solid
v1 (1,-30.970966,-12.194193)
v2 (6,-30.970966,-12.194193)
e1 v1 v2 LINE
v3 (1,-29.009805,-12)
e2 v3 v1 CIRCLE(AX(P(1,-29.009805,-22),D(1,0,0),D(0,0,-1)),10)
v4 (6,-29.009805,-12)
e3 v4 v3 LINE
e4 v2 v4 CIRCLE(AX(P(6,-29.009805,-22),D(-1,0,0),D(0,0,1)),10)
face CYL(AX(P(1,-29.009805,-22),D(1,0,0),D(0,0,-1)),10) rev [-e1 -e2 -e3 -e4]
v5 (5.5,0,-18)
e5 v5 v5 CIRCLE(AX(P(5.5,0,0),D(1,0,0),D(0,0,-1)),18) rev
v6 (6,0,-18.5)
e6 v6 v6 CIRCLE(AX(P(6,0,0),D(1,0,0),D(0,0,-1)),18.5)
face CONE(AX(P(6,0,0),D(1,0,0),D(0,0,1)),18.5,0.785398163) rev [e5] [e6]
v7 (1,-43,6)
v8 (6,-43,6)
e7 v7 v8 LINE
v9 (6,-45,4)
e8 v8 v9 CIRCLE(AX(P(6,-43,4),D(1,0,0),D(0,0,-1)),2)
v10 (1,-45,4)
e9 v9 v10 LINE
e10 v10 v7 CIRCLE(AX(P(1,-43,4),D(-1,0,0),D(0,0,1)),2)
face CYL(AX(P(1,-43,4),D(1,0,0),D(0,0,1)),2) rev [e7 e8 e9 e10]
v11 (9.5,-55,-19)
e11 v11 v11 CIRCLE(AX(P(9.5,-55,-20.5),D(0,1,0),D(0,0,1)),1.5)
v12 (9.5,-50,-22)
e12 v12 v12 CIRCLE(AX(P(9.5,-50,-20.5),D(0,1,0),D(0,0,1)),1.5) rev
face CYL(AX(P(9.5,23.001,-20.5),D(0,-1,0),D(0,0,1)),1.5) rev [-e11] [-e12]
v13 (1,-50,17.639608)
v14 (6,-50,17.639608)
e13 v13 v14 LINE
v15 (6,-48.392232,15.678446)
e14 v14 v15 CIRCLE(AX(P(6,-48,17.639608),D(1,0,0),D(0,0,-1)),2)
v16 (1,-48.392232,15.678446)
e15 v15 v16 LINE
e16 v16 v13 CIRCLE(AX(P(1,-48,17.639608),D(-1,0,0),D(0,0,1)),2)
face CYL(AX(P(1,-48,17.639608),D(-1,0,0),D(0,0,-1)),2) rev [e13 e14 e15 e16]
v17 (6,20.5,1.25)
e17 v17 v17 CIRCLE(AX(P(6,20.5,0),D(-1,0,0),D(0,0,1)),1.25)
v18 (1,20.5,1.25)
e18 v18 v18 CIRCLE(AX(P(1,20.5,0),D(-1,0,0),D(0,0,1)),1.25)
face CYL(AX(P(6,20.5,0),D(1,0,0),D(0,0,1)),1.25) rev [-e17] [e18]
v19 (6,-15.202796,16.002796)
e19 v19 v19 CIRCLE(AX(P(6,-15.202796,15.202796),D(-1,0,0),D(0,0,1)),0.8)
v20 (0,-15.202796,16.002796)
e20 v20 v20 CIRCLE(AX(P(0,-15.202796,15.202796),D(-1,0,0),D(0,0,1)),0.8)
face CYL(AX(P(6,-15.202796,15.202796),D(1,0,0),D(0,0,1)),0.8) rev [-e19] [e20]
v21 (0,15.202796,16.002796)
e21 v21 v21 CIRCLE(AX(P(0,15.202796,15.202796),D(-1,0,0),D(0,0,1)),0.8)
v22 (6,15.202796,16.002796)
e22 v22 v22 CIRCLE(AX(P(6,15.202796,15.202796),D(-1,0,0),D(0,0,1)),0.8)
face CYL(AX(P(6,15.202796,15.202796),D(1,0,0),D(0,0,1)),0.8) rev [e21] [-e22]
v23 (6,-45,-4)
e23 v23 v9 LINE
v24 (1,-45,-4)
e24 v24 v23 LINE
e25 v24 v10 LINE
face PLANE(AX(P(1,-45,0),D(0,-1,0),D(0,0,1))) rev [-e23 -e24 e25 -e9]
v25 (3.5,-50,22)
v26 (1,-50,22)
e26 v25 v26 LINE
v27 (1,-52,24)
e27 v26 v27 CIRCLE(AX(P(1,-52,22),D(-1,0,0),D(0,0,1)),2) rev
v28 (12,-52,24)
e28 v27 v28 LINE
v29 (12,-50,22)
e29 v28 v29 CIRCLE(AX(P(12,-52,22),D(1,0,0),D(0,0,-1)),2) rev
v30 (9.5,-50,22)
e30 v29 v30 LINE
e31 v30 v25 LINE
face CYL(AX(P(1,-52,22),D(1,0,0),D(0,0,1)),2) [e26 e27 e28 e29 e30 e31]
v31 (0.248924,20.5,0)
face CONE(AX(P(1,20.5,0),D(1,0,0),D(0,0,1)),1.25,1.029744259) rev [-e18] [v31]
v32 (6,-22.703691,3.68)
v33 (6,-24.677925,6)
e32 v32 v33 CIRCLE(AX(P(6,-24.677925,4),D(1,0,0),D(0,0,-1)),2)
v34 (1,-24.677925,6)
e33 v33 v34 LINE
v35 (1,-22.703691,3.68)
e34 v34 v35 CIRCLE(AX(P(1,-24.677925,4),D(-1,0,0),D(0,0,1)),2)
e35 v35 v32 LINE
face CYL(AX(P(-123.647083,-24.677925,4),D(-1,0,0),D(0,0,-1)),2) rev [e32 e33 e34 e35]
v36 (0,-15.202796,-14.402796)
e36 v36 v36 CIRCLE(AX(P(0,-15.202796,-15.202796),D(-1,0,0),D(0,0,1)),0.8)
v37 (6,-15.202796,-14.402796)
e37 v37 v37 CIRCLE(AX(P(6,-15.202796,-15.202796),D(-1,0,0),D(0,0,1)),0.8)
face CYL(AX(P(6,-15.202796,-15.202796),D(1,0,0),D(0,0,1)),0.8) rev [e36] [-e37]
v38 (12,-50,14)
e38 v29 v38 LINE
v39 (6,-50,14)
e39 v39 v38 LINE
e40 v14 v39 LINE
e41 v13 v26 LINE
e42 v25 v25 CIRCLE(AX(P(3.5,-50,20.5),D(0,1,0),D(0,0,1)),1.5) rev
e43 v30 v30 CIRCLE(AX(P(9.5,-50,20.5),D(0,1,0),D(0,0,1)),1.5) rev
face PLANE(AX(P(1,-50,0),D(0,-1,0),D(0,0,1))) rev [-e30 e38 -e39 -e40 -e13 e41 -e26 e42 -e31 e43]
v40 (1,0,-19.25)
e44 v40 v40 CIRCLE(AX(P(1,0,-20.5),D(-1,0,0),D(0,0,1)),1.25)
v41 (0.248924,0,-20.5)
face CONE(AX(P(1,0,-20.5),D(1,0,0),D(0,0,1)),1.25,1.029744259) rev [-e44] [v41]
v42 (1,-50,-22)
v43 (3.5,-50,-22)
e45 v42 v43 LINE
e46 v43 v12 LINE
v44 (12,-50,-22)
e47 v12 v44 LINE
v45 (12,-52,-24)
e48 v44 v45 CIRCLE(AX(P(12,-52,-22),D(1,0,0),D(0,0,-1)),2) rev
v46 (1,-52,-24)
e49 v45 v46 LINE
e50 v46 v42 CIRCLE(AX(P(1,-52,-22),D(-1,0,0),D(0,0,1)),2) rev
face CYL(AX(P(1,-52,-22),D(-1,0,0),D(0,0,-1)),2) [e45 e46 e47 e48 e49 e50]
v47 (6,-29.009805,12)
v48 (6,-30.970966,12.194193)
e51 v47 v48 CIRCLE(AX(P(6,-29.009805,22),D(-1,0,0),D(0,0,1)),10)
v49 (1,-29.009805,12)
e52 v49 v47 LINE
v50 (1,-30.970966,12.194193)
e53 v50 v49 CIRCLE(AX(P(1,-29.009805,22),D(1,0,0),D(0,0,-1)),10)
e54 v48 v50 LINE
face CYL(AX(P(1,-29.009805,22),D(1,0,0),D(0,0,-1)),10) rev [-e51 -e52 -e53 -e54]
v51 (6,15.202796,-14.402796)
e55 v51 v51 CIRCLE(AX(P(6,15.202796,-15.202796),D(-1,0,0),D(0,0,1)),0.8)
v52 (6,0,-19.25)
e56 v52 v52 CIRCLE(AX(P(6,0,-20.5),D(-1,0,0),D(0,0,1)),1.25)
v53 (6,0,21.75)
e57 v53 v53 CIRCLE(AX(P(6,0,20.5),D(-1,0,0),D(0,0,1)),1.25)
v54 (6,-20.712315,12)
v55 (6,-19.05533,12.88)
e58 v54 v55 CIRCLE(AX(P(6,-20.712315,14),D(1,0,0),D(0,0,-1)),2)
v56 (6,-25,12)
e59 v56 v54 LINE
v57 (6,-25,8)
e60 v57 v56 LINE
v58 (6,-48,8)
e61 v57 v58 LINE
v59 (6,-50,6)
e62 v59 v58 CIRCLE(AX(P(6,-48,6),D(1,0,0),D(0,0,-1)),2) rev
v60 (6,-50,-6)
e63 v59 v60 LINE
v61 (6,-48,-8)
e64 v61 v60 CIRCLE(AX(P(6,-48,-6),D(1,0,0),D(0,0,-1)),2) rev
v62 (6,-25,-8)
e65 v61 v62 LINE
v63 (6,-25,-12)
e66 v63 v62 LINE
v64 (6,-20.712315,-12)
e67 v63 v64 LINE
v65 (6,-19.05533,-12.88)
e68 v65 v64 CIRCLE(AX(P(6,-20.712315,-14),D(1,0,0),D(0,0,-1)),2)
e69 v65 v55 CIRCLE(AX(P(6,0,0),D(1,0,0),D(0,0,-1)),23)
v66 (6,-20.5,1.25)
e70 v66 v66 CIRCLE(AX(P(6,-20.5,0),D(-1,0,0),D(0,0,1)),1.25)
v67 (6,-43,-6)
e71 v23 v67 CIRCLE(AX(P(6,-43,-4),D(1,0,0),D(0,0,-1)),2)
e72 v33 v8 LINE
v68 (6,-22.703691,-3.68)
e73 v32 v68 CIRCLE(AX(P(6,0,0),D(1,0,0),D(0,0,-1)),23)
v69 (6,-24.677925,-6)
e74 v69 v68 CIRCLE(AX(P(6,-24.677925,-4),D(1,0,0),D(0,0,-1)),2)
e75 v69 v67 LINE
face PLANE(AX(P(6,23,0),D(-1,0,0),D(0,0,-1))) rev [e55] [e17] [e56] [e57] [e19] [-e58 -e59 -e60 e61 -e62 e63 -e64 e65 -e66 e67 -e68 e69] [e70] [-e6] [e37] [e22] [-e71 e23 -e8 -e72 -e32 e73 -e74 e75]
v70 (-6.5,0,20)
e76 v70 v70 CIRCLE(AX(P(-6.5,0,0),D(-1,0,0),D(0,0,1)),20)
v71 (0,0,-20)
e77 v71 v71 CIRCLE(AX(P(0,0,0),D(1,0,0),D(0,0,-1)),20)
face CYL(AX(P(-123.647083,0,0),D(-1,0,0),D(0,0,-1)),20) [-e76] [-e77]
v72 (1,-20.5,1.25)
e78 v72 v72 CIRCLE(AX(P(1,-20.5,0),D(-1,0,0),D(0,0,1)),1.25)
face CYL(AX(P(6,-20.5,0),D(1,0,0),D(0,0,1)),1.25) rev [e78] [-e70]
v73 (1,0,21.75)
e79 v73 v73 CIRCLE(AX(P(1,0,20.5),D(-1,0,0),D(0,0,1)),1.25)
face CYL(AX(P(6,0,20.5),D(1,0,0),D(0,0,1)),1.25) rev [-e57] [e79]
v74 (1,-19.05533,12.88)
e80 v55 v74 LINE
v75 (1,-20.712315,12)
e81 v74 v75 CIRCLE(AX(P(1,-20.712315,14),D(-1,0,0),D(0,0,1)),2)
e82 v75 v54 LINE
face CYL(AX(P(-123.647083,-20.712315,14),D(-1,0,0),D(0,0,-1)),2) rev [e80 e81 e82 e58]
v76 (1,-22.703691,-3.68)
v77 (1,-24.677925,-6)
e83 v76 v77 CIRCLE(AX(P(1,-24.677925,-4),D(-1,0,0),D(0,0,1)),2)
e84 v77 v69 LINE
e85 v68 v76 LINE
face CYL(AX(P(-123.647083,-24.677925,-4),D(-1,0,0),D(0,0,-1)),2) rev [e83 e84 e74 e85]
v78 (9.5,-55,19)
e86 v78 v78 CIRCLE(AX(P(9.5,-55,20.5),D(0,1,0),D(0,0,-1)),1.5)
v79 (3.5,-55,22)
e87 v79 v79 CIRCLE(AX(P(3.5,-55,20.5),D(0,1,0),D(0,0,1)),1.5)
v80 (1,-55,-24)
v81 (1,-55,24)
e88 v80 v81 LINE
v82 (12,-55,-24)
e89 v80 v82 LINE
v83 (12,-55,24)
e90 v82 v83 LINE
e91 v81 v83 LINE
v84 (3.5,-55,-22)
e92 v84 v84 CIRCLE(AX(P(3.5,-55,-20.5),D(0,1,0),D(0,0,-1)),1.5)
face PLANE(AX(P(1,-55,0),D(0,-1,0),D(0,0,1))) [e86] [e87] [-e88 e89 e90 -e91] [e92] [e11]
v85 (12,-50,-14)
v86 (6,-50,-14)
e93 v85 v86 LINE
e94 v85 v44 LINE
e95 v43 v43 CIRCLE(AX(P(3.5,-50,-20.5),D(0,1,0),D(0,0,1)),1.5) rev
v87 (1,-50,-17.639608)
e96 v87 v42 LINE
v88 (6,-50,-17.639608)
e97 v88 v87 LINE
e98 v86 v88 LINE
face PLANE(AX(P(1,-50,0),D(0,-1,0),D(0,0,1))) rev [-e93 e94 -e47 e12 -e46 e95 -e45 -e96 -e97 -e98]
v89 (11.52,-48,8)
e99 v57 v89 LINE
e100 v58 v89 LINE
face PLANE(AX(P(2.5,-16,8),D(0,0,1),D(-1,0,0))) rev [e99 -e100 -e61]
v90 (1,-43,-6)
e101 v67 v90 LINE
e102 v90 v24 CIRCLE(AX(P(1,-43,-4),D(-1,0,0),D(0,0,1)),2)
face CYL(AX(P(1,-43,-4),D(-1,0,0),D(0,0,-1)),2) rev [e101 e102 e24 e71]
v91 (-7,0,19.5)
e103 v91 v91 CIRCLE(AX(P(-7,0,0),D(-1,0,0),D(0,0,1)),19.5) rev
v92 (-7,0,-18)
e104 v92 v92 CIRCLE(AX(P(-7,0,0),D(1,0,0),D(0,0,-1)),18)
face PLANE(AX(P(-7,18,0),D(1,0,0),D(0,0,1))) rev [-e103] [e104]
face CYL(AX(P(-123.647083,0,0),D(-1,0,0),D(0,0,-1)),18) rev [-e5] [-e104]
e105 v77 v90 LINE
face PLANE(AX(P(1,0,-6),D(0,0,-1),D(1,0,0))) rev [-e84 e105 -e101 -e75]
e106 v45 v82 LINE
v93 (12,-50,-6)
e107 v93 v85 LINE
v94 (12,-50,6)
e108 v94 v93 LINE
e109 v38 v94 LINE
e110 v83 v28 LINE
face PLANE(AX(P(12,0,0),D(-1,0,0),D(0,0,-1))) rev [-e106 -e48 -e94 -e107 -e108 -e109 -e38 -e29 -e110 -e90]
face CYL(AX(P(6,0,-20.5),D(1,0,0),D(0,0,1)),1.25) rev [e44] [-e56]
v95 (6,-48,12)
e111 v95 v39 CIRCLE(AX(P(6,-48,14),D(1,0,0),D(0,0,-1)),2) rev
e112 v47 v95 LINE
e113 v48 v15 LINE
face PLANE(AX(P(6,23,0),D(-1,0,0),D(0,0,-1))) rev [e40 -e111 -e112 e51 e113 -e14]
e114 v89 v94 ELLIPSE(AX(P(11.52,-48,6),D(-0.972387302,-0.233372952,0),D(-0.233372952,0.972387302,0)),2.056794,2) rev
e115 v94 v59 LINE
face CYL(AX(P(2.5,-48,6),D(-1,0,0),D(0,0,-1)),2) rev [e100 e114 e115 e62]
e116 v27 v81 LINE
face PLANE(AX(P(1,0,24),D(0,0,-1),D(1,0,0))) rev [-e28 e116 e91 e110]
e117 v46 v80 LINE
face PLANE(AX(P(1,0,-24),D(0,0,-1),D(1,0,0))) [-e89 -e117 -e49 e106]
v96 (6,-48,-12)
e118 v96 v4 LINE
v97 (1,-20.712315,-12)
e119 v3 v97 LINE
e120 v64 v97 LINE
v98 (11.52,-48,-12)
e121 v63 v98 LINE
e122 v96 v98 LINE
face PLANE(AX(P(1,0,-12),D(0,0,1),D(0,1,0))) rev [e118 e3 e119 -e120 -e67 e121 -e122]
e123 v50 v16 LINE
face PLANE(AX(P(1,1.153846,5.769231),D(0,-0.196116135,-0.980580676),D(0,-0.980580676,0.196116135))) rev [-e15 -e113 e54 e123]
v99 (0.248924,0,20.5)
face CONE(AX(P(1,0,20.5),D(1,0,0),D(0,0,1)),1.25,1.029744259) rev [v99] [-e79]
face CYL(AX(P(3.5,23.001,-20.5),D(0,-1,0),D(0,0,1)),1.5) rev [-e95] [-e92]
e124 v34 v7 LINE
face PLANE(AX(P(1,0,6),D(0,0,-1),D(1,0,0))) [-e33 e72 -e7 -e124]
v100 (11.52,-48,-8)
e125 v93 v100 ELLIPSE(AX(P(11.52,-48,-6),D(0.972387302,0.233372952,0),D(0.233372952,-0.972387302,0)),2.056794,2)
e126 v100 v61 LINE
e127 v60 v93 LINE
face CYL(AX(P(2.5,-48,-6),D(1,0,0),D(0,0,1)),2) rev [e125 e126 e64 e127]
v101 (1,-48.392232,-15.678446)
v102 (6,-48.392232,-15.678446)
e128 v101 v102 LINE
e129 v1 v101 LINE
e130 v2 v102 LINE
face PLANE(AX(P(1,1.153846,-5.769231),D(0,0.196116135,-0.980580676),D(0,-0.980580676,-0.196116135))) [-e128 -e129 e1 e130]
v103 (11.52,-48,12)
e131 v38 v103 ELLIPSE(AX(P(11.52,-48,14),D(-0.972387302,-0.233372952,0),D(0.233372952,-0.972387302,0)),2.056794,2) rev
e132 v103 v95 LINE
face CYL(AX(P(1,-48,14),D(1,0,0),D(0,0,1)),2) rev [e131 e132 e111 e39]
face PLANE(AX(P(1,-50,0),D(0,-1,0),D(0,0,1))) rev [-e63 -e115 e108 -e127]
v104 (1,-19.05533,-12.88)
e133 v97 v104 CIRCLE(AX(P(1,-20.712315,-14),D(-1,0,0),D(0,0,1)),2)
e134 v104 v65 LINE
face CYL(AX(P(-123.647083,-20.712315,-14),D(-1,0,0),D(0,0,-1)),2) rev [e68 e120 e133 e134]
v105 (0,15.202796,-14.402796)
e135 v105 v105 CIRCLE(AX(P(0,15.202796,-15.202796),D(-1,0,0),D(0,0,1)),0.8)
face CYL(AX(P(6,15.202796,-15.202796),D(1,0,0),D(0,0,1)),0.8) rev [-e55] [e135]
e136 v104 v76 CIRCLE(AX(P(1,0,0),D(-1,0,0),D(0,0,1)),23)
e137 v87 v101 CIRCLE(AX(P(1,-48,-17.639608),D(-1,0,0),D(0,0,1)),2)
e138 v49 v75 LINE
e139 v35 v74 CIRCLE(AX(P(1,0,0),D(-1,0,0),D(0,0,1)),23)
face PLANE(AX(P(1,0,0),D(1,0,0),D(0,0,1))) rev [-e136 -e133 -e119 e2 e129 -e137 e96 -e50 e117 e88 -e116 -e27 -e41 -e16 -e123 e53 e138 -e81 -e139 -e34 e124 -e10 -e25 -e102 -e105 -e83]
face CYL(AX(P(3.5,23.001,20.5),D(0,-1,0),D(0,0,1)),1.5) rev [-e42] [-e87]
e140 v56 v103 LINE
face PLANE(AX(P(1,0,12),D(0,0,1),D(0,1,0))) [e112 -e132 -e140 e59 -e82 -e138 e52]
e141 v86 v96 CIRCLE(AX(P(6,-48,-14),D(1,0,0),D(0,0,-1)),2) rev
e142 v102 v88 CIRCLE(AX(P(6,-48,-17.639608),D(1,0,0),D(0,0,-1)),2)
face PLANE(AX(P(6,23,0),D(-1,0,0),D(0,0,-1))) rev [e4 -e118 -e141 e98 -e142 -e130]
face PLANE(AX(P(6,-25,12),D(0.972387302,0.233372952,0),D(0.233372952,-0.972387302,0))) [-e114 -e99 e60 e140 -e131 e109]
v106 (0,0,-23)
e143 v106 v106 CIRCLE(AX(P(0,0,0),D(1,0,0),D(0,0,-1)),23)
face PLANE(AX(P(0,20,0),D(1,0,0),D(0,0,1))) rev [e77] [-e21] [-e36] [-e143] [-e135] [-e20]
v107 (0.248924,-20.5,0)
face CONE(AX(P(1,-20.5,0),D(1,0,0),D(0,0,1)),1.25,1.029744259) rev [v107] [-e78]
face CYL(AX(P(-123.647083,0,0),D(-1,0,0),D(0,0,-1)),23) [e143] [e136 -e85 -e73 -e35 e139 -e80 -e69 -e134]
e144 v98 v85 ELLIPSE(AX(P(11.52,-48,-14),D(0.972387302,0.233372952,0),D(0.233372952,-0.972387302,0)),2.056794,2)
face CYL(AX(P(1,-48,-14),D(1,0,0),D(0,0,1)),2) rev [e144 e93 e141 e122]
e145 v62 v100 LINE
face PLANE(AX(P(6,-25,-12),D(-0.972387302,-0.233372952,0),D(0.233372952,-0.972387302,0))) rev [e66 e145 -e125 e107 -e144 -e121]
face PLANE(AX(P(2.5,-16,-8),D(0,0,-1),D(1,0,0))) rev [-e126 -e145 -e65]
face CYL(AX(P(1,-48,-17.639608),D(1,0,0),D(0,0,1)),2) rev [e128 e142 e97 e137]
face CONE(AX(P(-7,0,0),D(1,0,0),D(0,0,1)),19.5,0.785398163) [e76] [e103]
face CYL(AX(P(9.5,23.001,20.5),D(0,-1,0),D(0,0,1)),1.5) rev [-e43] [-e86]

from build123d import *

# Parameters (mm, degrees)
EXTRUDE_1_DEPTH        = 5
SKETCH_16_W            = 48
SKETCH_16_H            = 5
EXTRUDE_3_DEPTH        = 11
CUT_EXTRUDE_4_REACH    = 84.486
SKETCH_5_R             = 1.5
RIB_1_REACH            = 68.821
SKETCH_17_WALL_W       = 161.351231242
SKETCH_17_WALL_H       = 4
FILLET_1_R             = 2
HOLE_WIZARD_M3_2_D     = 2.5
HOLE_WIZARD_M3_2_DEPTH = 5
HOLE_WIZARD_M3_2_TIP   = 0.751075774
HOLE_WIZARD_M2_1_D     = 1.6
CHAMFER_1_SIZE         = 0.5
FILLET_2_R             = 10


with BuildPart() as part:
    # 草图3 → 旋转1 (revolve)
    with BuildSketch(Plane.XY, mode=Mode.PRIVATE) as revolve_1_sk:
        Polygon((6, 18), (-7, 18), (-7, 20), (0, 20), (0, 23), (6, 23), align=None)
    revolve(revolve_1_sk.sketch.rotate(Axis((-123.647082632, 0, 0), (1, 0, 0)), 90), axis=Axis((-123.647082632, 0, 0), (1, 0, 0)))

    # 草图4 → 凸台-拉伸1 (add)
    with BuildSketch(Plane(origin=(6, 0, 0), x_dir=(0, 0, -1), z_dir=(1, 0, 0))):
        with BuildLine():
            Line((-12, -19.62141687), (-12, -30))
            Line((-12, -30), (-16, -50))
            Line((-16, -50), (-24, -50))
            Line((-24, -50), (-24, -55))
            Line((-24, -55), (24, -55))
            Line((24, -55), (24, -50))
            Line((24, -50), (16, -50))
            Line((16, -50), (12, -30))
            Line((12, -30), (12, -19.62141687))
            ThreePointArc((12, -19.62141687), (9.092135156, -21.126596467), (6, -22.203603311))
            Line((6, -22.203603311), (6, -45))
            Line((6, -45), (-6, -45))
            Line((-6, -45), (-6, -22.203603311))
            ThreePointArc((-6, -22.203603311), (-9.092135156, -21.126596467), (-12, -19.62141687))
        make_face()
    extrude(amount=-EXTRUDE_1_DEPTH)

    # 草图16 → 凸台-拉伸3 (add)
    with BuildSketch(Plane(origin=(1, 0, 0), x_dir=(0, 0, -1), z_dir=(1, 0, 0))):
        with Locations((0, -52.5)):
            Rectangle(SKETCH_16_W, SKETCH_16_H)
    extrude(amount=EXTRUDE_3_DEPTH)

    # 草图5 → 切除-拉伸4 (cut, up to next)
    with BuildSketch(Plane.XZ.offset(55), mode=Mode.PRIVATE) as cut_extrude_4_sk1:
        with Locations(Location((9.5, 20.5, 0), (0, 0, 270))):
            Circle(SKETCH_5_R)
    cut_extrude_4_tool1 = extrude(cut_extrude_4_sk1.sketch, amount=-CUT_EXTRUDE_4_REACH, mode=Mode.PRIVATE) & part.part
    # 草图5 → 切除-拉伸4 (cut, up to next)
    with BuildSketch(Plane.XZ.offset(55), mode=Mode.PRIVATE) as cut_extrude_4_sk2:
        with Locations(Location((9.5, -20.5, 0), (0, 0, 270))):
            Circle(SKETCH_5_R)
    cut_extrude_4_tool2 = extrude(cut_extrude_4_sk2.sketch, amount=-CUT_EXTRUDE_4_REACH, mode=Mode.PRIVATE) & part.part
    # 草图5 → 切除-拉伸4 (cut, up to next)
    with BuildSketch(Plane.XZ.offset(55), mode=Mode.PRIVATE) as cut_extrude_4_sk3:
        with Locations(Location((3.5, -20.5, 0), (0, 0, 270))):
            Circle(SKETCH_5_R)
    cut_extrude_4_tool3 = extrude(cut_extrude_4_sk3.sketch, amount=-CUT_EXTRUDE_4_REACH, mode=Mode.PRIVATE) & part.part
    # 草图5 → 切除-拉伸4 (cut, up to next)
    with BuildSketch(Plane.XZ.offset(55), mode=Mode.PRIVATE) as cut_extrude_4_sk4:
        with Locations(Location((3.5, 20.5, 0), (0, 0, 270))):
            Circle(SKETCH_5_R)
    cut_extrude_4_tool4 = extrude(cut_extrude_4_sk4.sketch, amount=-CUT_EXTRUDE_4_REACH, mode=Mode.PRIVATE) & part.part
    add(cut_extrude_4_tool1.solids().sort_by_distance((9.5, -55, 20.5))[0], mode=Mode.SUBTRACT)
    add(cut_extrude_4_tool2.solids().sort_by_distance((9.5, -55, -20.5))[0], mode=Mode.SUBTRACT)
    add(cut_extrude_4_tool3.solids().sort_by_distance((3.5, -55, -20.5))[0], mode=Mode.SUBTRACT)
    add(cut_extrude_4_tool4.solids().sort_by_distance((3.5, -55, 20.5))[0], mode=Mode.SUBTRACT)

    # 草图17 wall → 筋1 (add, up to next)
    with BuildSketch(Plane(origin=(9, -37.5, 12), x_dir=(0.233372952475, -0.972387301981, 0), z_dir=(0.972387301981, 0.233372952475, 0)), mode=Mode.PRIVATE) as rib_1_sk1:
        with Locations((0, 2)):
            Rectangle(SKETCH_17_WALL_W, SKETCH_17_WALL_H)
    rib_1_tool1 = extrude(rib_1_sk1.sketch, amount=-RIB_1_REACH, mode=Mode.PRIVATE) - part.part
    rib_1 = rib_1_tool1.solids().sort_by_distance((9, -37.5, 12))[0]
    add(rib_1)

    # 镜向1: 筋1 across plane
    add(rib_1.mirror(Plane.XY))

    # 圆角1
    fillet_1_edges = [part.edges().sort_by_distance(p)[0] for p in [
        (9, -50, 12),
        (9, -50, 8),
        (9, -50, -8),
        (9, -50, -12),
        (3.5, -22.203603311, -6),
        (3.5, -19.62141687, -12),
        (3.5, -50, -16),
        (6.5, -50, -24),
        (6.5, -50, 24),
        (3.5, -50, 16),
        (3.5, -19.62141687, 12),
        (3.5, -22.203603311, 6),
        (3.5, -45, 6),
        (3.5, -45, -6),
    ]]
    fillet(fillet_1_edges, radius=FILLET_1_R - 0.0001)  # a hair under: the kernel refuses the full size

    # M3 螺纹孔2
    with Locations(Plane(origin=(6, 0, 0), x_dir=(0, 0, -1), z_dir=(1, 0, 0))):
        with Locations((0, 20.5), (-20.5, 0), (0, -20.5), (20.5, 0)):
            Hole(HOLE_WIZARD_M3_2_D / 2, depth=HOLE_WIZARD_M3_2_DEPTH)
            with Locations((0, 0, -(HOLE_WIZARD_M3_2_DEPTH + HOLE_WIZARD_M3_2_TIP / 2))):  # 118° drill point
                Cone(0, HOLE_WIZARD_M3_2_D / 2, HOLE_WIZARD_M3_2_TIP, mode=Mode.SUBTRACT)

    # M2 螺纹孔1 (through all)
    with Locations(Plane(origin=(6, 0, 0), x_dir=(0, 0, -1), z_dir=(1, 0, 0))):
        with Locations((-15.202795796, 15.202795796), (15.202795796, 15.202795796), (15.202795796, -15.202795796), (-15.202795796, -15.202795796)):
            Hole(HOLE_WIZARD_M2_1_D / 2)

    # 倒角1
    chamfer_1_edges = [part.edges().sort_by_distance(p)[0] for p in [
        (6, 0, -18),
        (-7, 0, -20),
    ]]
    chamfer(chamfer_1_edges, length=CHAMFER_1_SIZE)

    # 圆角2
    fillet_2_edges = [part.edges().sort_by_distance(p)[0] for p in [
        (3.5, -30, 12),
        (3.5, -30, -12),
    ]]
    fillet(fillet_2_edges, radius=FILLET_2_R)


solid = part.part
